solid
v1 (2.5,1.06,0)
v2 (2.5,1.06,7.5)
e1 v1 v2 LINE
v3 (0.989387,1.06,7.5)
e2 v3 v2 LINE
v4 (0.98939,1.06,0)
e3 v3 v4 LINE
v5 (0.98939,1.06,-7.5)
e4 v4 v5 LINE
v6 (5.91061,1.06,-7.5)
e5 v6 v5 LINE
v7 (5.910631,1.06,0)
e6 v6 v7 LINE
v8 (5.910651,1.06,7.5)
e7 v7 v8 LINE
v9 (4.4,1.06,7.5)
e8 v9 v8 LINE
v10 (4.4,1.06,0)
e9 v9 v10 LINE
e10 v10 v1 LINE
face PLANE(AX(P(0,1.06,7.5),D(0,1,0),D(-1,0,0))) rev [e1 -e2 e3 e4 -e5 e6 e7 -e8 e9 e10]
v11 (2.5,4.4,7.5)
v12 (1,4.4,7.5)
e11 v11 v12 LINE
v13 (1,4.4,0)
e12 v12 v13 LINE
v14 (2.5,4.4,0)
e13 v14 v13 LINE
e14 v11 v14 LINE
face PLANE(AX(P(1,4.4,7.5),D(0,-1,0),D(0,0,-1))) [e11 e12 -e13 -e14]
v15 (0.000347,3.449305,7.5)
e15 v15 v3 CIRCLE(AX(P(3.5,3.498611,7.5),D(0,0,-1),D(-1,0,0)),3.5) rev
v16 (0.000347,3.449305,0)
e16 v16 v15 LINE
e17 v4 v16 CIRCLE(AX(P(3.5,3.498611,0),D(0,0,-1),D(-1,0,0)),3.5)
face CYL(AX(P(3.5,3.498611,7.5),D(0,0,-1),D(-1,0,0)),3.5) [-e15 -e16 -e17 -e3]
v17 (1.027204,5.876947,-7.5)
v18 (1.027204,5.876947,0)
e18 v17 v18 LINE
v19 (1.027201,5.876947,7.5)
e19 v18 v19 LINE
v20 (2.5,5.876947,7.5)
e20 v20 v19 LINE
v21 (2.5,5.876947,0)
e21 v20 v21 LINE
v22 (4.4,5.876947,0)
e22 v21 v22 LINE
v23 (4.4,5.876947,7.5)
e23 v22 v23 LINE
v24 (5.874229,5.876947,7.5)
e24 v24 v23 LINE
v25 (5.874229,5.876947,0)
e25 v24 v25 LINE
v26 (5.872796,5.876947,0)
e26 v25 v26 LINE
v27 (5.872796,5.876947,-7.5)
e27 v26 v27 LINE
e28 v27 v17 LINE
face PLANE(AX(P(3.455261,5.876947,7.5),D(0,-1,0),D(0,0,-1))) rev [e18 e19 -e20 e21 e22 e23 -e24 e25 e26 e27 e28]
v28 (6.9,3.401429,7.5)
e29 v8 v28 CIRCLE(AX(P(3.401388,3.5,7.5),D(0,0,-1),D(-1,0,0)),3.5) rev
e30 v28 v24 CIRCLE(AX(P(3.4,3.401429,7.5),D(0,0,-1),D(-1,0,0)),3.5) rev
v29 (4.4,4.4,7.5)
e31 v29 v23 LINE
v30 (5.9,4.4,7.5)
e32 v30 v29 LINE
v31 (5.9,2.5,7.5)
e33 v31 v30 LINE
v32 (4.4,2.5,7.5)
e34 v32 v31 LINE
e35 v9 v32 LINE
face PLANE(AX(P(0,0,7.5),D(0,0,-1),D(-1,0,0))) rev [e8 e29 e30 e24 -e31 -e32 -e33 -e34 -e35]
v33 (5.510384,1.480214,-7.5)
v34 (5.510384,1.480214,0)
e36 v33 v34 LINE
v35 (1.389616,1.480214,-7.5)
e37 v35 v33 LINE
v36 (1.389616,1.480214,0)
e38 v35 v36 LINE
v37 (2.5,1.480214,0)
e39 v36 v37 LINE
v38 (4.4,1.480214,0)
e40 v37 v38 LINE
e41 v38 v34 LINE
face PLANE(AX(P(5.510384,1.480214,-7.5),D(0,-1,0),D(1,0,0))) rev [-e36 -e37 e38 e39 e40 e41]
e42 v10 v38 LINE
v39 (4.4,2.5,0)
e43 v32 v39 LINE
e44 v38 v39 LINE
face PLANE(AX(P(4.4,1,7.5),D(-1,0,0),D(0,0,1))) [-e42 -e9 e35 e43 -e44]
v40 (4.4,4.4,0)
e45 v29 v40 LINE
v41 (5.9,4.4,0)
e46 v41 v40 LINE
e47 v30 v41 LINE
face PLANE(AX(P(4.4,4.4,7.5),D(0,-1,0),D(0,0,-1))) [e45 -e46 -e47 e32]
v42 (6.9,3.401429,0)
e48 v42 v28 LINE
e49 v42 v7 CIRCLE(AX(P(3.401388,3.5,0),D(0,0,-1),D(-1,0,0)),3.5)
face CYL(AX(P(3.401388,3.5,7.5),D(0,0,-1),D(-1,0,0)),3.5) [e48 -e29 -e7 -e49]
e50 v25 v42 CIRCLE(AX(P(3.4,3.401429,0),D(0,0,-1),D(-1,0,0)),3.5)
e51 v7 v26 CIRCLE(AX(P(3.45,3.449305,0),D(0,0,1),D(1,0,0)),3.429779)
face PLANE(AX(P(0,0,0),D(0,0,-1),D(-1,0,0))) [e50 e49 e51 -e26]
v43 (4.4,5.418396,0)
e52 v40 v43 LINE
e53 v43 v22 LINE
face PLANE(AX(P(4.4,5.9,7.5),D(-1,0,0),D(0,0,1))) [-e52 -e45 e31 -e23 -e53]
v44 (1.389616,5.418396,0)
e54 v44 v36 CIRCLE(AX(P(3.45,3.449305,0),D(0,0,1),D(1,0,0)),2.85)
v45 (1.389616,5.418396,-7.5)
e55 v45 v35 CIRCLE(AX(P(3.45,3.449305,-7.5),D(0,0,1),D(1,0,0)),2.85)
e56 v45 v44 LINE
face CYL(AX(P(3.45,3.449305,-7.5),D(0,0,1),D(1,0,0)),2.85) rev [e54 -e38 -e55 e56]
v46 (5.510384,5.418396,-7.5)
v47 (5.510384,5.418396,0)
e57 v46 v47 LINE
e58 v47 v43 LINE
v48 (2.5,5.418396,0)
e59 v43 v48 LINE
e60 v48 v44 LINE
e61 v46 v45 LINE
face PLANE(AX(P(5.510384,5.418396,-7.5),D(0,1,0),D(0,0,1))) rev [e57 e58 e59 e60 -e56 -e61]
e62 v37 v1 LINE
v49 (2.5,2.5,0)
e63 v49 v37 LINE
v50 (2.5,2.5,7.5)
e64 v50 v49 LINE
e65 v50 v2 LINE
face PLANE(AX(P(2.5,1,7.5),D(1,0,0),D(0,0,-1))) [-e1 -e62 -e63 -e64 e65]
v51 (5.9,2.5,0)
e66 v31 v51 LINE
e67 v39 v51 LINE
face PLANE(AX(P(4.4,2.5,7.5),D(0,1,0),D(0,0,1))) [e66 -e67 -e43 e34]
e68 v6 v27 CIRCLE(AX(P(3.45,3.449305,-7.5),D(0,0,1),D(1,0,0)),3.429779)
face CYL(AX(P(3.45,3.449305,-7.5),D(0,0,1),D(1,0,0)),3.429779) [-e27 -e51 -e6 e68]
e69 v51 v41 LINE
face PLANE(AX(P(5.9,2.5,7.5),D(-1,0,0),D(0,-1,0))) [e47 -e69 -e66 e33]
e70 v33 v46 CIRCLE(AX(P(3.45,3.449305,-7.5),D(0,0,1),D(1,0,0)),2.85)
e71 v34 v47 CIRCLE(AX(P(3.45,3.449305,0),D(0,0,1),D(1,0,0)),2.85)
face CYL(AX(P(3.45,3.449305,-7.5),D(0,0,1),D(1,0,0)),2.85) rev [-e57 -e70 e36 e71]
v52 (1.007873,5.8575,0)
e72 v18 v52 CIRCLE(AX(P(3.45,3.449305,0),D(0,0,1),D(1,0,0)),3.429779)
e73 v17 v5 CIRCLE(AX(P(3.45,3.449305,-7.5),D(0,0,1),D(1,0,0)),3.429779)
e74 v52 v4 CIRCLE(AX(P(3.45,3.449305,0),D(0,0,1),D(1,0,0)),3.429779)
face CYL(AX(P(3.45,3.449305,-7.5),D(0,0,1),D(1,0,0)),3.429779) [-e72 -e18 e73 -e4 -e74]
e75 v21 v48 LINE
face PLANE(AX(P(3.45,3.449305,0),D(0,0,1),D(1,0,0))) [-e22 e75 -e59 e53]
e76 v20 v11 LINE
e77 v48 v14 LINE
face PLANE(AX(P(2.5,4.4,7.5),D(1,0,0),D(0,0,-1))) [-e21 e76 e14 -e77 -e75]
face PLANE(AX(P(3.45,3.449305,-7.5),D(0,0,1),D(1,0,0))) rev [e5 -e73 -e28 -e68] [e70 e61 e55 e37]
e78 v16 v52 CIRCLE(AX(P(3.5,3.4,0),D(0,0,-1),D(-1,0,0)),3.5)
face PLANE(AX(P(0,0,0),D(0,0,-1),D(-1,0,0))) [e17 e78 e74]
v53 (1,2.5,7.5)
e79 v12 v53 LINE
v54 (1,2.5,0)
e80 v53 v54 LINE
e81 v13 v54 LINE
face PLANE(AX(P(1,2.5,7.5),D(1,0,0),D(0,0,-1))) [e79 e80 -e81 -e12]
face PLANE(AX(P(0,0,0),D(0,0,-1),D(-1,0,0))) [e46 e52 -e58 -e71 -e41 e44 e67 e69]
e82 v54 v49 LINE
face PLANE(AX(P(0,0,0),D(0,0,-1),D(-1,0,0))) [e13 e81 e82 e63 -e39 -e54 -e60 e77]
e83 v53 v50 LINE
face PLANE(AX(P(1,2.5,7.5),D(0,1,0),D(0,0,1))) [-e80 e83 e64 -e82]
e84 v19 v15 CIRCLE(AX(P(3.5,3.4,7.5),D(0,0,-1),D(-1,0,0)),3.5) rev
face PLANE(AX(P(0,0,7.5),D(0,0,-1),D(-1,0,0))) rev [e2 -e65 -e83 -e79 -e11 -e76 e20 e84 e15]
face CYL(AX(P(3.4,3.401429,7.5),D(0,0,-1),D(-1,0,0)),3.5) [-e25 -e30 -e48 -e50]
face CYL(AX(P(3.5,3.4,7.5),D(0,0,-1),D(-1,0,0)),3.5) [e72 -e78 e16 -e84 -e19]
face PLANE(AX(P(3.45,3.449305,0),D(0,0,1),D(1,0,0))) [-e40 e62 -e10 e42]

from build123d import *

# Parameters (mm, degrees)
SKETCH1_W           = 6.9
SKETCH1_H           = 6.9
BOSS_EXTRUDE1_DEPTH = 7.5
FILLET2_R           = 3.5
FILLET3_R           = 3.5
FILLET4_R           = 3.5
FILLET5_DEPTH       = 7.5
SKETCH2_R           = 3.429778851
BOSS_EXTRUDE3_DEPTH = 7.5
SKETCH4_W           = 6.879778851
SKETCH4_H           = 1.06
CUT_EXTRUDE6_DEPTH  = 15
CUT_EXTRUDE8_DEPTH  = 15


with BuildPart() as part:
    # Sketch1 → Boss-Extrude1 (new body)
    with BuildSketch(Plane.XY):
        with Locations((3.45, 3.45)):
            Rectangle(SKETCH1_W, SKETCH1_H)
        Polygon((3.45, 5.9), (4.4, 5.9), (4.4, 4.4), (5.9, 4.4), (5.9, 2.5), (4.4, 2.5), (4.4, 1), (2.5, 1), (2.5, 2.5), (1, 2.5), (1, 4.4), (2.5, 4.4), (2.5, 5.9), align=None, mode=Mode.SUBTRACT)
    extrude(amount=BOSS_EXTRUDE1_DEPTH)

    # Fillet2
    fillet2_edges = [part.edges().sort_by_distance(p)[0] for p in [
        (0, 6.9, 3.75),
    ]]
    fillet(fillet2_edges, radius=FILLET2_R)

    # Fillet3
    # the kernel refuses this fillet: 3.5 mm, written as the material it takes off along each edge
    with BuildSketch(Plane(origin=(6.9, 6.9, -8.746427842), x_dir=(-1, 0, 0), z_dir=(0, 0, 1))) as fillet3_piece_1:
        with BuildLine():
            CenterArc((3.5, 3.498571137), FILLET3_R, 180, 88.362754922)
            Line((0, 3.498571137), (-0.07, 3.498571137))
            Line((-0.07, 3.498571137), (-0.07, 0))
            Line((-0.07, 0), (0, -0.07))
            ThreePointArc((0, -0.07), (1.7, -0.07), (3.398, -0.069971423))
            Line((3.398, -0.069971423), (3.4, 0))
        make_face()
    extrude(amount=24.992855685, mode=Mode.SUBTRACT)

    # Fillet4
    # the kernel refuses this fillet: 3.5 mm, written as the material it takes off along each edge
    with BuildSketch(Plane(origin=(6.9, 0, -8.746529216), x_dir=(0, 1, 0), z_dir=(0, 0, 1))) as fillet4_piece_1:
        with BuildLine():
            CenterArc((3.5, 3.498611686), FILLET4_R, 180, 88.386155146)
            Line((0, 3.498611686), (-0.07, 3.498611686))
            Line((-0.07, 3.498611686), (-0.07, 0))
            Line((-0.07, 0), (0, -0.07))
            ThreePointArc((0, -0.07), (1.700714432, -0.07), (3.39945744, -0.069972234))
            Line((3.39945744, -0.069972234), (3.401428863, 0))
        make_face()
    extrude(amount=24.993058431, mode=Mode.SUBTRACT)

    # Fillet5: read off the stored shape, not the designer's step
    # Fillet5 outline → Fillet5 (cut)
    with BuildSketch(Plane.XY):
        with BuildLine():
            Line((0, 0), (3.401388314, 0))
            ThreePointArc((3.401388314, 0), (1.007751346, 1.041234576), (0.000347304, 3.449305272))
            ThreePointArc((0.000347304, 3.449305272), (8.6827e-05, 3.424653248), (0, 3.4))
            Line((0, 3.4), (0, 0))
        make_face()
    extrude(amount=FILLET5_DEPTH, mode=Mode.SUBTRACT)

    # Sketch2 → Boss-Extrude3 (add)
    with BuildSketch(Plane.XY):
        with Locations((3.45, 3.449305272)):
            Circle(SKETCH2_R)
        with BuildLine():
            Line((5.5103837, 5.418396181), (1.3896163, 5.418396181))
            ThreePointArc((1.3896163, 5.418396181), (0.6, 3.449305272), (1.3896163, 1.480214363))
            Line((1.3896163, 1.480214363), (5.5103837, 1.480214363))
            ThreePointArc((5.5103837, 1.480214363), (6.3, 3.449305272), (5.5103837, 5.418396181))
        make_face(mode=Mode.SUBTRACT)
    extrude(amount=-BOSS_EXTRUDE3_DEPTH)

    # Sketch4 → Cut-Extrude6 (cut)
    with BuildSketch(Plane(origin=(0, 0, -7.5), x_dir=(-1, 0, 0), z_dir=(0, 0, -1))):
        with Locations((-3.439889426, 0.53)):
            Rectangle(SKETCH4_W, SKETCH4_H)
    extrude(amount=-CUT_EXTRUDE6_DEPTH, mode=Mode.SUBTRACT)

    # Sketch6 → Cut-Extrude8 (cut)
    with BuildSketch(Plane(origin=(0, 0, -7.5), x_dir=(-1, 0, 0), z_dir=(0, 0, -1))):
        Polygon((-3.455260778, 6.975766387), (-6.044608069, 6.975766387), (-6.044608069, 5.876947105), (-3.455260778, 5.876947105), (-1.008353024, 5.876947105), (-1.008353024, 6.975766387), align=None)
    extrude(amount=-CUT_EXTRUDE8_DEPTH, mode=Mode.SUBTRACT)


solid = part.part
